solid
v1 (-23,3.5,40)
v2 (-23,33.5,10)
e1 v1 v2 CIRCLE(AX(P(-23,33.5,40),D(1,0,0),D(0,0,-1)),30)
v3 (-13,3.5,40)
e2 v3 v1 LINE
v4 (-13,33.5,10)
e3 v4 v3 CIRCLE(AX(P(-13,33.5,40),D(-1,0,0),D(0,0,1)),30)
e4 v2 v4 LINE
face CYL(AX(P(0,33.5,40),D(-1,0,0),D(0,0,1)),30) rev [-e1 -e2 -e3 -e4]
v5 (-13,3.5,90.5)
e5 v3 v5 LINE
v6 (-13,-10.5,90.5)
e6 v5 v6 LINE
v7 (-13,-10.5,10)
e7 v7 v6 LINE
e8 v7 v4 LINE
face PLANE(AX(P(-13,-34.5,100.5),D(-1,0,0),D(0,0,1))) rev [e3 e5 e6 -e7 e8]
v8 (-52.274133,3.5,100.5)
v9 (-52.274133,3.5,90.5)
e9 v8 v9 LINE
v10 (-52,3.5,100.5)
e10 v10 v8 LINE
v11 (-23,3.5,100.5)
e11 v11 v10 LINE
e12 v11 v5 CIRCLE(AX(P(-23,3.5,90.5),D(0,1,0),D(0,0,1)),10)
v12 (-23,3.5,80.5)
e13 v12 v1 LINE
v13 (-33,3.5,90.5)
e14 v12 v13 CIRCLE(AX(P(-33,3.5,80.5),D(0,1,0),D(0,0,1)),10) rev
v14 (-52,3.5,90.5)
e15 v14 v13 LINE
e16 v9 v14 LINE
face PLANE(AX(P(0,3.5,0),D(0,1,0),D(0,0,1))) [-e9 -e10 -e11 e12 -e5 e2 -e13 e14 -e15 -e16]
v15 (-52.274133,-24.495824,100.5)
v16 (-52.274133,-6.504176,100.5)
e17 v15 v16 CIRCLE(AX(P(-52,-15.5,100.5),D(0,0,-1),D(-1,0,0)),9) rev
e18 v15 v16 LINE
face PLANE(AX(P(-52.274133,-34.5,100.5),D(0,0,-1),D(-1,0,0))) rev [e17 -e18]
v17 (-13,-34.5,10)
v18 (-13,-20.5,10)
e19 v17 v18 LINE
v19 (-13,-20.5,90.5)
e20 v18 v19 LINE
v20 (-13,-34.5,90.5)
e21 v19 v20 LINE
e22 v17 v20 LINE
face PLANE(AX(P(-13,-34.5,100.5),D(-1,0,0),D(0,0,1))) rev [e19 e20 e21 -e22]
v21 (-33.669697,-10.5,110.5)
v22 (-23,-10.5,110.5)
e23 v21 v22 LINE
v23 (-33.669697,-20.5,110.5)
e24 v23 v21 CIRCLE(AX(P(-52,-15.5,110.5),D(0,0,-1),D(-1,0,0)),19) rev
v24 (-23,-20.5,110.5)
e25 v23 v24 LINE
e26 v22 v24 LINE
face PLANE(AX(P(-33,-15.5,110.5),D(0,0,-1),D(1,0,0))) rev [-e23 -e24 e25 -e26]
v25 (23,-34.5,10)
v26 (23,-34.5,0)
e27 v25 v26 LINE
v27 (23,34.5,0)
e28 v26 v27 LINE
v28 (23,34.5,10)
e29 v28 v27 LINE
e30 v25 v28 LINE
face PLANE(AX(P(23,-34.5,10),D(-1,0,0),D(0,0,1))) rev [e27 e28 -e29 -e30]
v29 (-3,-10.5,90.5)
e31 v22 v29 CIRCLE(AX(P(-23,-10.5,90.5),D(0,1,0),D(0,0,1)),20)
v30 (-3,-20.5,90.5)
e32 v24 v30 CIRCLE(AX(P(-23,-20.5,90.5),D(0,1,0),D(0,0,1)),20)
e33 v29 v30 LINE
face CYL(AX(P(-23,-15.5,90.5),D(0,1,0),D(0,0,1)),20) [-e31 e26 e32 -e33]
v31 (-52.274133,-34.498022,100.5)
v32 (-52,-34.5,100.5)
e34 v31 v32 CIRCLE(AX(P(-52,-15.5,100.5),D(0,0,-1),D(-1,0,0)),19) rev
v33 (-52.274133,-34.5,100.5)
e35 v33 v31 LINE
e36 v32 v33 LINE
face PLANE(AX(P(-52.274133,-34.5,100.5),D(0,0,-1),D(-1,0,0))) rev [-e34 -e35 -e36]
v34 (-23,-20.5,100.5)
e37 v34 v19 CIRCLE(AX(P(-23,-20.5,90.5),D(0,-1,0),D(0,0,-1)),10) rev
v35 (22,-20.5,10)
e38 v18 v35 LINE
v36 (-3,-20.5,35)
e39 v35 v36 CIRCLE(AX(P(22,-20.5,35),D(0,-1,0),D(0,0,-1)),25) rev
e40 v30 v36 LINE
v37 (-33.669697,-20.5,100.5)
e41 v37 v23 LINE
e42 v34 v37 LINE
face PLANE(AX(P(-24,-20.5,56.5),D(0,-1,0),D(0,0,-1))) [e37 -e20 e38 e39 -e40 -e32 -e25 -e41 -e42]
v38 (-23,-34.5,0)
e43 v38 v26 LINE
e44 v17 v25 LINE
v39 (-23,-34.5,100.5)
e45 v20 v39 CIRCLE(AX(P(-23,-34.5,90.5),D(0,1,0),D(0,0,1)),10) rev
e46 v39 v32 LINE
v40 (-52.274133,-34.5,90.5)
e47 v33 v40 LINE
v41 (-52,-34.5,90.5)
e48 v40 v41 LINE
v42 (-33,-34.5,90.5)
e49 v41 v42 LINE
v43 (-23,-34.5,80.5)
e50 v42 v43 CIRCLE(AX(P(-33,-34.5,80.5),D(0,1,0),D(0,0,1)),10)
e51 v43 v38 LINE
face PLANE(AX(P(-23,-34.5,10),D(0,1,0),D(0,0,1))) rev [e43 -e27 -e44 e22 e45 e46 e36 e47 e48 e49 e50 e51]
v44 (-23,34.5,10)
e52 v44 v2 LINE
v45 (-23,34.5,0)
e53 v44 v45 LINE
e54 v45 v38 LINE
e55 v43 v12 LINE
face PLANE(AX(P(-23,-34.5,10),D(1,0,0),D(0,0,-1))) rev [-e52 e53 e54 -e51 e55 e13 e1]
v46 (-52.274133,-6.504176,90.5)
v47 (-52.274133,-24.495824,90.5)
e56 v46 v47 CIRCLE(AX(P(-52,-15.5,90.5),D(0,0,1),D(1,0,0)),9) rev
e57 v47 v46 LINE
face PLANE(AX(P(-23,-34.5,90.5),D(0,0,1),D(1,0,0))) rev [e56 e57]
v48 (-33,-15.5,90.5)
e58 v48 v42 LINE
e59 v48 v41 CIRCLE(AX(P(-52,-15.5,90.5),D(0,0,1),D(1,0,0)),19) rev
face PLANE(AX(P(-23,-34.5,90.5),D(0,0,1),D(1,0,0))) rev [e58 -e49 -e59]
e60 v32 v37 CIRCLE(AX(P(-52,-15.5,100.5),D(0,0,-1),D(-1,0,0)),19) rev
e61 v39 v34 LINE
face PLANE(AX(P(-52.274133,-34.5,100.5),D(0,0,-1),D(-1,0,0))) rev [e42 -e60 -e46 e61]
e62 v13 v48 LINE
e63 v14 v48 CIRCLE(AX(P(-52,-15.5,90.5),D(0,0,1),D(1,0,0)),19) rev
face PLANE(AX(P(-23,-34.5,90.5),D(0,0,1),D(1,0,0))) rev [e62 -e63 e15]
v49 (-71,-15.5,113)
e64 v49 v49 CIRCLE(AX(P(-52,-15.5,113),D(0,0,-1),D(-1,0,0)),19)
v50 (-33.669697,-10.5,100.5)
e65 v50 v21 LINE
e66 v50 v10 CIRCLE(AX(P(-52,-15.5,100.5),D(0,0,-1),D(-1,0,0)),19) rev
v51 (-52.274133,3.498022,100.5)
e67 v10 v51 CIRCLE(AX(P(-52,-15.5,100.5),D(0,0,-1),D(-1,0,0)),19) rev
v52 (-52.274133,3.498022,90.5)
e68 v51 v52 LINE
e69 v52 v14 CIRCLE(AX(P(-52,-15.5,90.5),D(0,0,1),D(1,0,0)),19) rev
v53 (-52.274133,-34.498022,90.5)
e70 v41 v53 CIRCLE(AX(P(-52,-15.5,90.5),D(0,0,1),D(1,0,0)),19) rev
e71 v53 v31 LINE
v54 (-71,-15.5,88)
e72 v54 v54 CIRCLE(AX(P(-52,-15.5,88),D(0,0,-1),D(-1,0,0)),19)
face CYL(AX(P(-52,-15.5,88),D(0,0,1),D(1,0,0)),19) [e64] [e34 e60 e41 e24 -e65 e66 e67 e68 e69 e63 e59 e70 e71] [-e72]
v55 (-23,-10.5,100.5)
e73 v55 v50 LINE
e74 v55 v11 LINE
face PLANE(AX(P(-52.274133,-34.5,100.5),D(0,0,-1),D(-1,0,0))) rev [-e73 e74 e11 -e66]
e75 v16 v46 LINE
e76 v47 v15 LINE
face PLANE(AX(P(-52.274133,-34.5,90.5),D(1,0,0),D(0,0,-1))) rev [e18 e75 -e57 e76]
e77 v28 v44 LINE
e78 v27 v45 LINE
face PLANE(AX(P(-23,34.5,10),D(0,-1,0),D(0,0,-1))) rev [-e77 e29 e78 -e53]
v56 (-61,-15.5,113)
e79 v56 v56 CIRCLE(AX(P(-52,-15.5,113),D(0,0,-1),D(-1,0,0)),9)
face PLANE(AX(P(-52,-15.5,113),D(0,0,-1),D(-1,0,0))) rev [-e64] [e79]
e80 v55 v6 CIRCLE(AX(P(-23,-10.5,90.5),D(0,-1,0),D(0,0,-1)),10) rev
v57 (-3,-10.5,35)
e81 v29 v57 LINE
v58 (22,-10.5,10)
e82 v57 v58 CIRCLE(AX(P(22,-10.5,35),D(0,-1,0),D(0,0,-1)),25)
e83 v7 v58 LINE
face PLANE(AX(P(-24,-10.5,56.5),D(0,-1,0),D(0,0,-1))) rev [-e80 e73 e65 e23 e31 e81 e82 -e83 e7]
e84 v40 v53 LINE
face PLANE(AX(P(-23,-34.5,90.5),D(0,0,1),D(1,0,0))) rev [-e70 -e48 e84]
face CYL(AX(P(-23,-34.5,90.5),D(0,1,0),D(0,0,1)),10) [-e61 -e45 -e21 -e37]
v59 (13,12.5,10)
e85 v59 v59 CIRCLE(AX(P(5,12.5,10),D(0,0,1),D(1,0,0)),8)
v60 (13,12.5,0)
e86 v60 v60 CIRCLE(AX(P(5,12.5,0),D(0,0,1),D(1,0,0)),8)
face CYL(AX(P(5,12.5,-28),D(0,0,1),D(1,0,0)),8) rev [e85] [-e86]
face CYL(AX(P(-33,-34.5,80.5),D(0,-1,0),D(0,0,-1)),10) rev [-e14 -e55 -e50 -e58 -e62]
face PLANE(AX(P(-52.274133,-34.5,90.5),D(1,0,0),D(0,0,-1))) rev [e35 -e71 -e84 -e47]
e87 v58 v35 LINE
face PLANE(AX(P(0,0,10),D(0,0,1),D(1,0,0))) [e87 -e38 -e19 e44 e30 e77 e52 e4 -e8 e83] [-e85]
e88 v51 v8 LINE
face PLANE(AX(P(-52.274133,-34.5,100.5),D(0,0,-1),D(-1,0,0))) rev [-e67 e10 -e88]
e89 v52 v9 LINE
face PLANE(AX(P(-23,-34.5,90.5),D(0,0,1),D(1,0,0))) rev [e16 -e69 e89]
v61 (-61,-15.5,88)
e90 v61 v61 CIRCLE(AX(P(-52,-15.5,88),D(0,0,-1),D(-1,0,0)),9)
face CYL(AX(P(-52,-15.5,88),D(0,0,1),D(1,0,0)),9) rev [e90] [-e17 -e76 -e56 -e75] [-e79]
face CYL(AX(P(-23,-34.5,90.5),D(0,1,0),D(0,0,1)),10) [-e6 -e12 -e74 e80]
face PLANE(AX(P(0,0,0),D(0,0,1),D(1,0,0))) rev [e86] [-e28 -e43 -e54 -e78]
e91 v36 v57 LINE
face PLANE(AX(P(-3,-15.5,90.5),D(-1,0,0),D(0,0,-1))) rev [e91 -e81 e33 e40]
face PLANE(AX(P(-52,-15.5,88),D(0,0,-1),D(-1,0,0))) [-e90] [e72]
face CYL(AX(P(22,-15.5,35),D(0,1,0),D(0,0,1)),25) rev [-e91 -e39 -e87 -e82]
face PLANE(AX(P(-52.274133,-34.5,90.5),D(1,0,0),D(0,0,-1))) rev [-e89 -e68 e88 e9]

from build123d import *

# Parameters (mm, degrees)
SKETCH1_W           = 69
SKETCH1_H           = 46
BOSS_EXTRUDE1_DEPTH = 10
SKETCH2_R           = 19
SKETCH2_R_2         = 9
BOSS_EXTRUDE2_DEPTH = 25
BOSS_EXTRUDE3_DEPTH = 19
FILLET1_R           = 30
FILLET2_R           = 10
RIB1_START          = -5
RIB1_DEPTH          = 10
FILLET3_R           = 25
SKETCH7_R           = 8
CUT_EXTRUDE1_DEPTH  = 38


# Read off the part's stored shape, not the designer's step: Rib1
with BuildPart() as part:
    # Sketch1 → Boss-Extrude1 (new body)
    with BuildSketch(Plane(origin=(0, 0, 0), x_dir=(0, 1, 0), z_dir=(0, 0, 1))):
        Rectangle(SKETCH1_W, SKETCH1_H)
    extrude(amount=BOSS_EXTRUDE1_DEPTH)



with BuildPart() as body_2:
    # Sketch2 → Boss-Extrude2 (new body)
    with BuildSketch(Plane(origin=(0, 0, 113), x_dir=(-1, 0, 0), z_dir=(0, 0, -1))):
        with Locations((52, -15.5)):
            Circle(SKETCH2_R)
        with Locations((52, -15.5)):
            Circle(SKETCH2_R_2, mode=Mode.SUBTRACT)
    extrude(amount=BOSS_EXTRUDE2_DEPTH)


with BuildPart() as part_1:
    add(part.part)

    add(body_2.part)  # Boss-Extrude3 merges body 2
    # Sketch5 → Boss-Extrude3 (add, symmetric)
    with BuildSketch(Plane(origin=(0, -15.5, 0), x_dir=(-1, 0, 0), z_dir=(0, -1, 0))):
        Polygon((23, -10), (23, -90.5), (52.274133124, -90.5), (52.274133124, -100.5), (13, -100.5), (13, -10), align=None)
    extrude(amount=BOSS_EXTRUDE3_DEPTH, both=True)

    # Fillet1
    fillet1_edges = [part_1.edges().sort_by_distance(p)[0] for p in [
        (-18, 3.5, 10),
    ]]
    fillet(fillet1_edges, radius=FILLET1_R)

    # Fillet2
    fillet2_edges = [part_1.edges().sort_by_distance(p)[0] for p in [
        (-23, -15.5, 90.5),
    ]]
    fillet(fillet2_edges, radius=FILLET2_R - 0.0001)  # a hair under: the kernel refuses the full size
    fillet2_2_edges = [part_1.edges().sort_by_distance(p)[0] for p in [
        (-13, -15.5, 100.5),
    ]]
    fillet(fillet2_2_edges, radius=FILLET2_R)

    # Rib1 outline → Rib1 (add)
    with BuildSketch(Plane(origin=(0, -15.5, 0), x_dir=(-1, 0, 0), z_dir=(0, -1, 0)).offset(RIB1_START)):
        with BuildLine():
            Line((23, -110.5), (35, -110.5))
            Line((35, -110.5), (35, -100.5))
            Line((35, -100.5), (23, -100.5))
            ThreePointArc((23, -100.5), (15.928932188, -97.571067812), (13, -90.5))
            Line((13, -90.5), (13, -10))
            Line((13, -10), (3, -10))
            Line((3, -10), (3, -90.5))
            ThreePointArc((3, -90.5), (8.857864376, -104.642135624), (23, -110.5))
        make_face()
    extrude(amount=RIB1_DEPTH)

    # Fillet3
    fillet3_edges = [part_1.edges().sort_by_distance(p)[0] for p in [
        (-3, -15.5, 10),
    ]]
    fillet(fillet3_edges, radius=FILLET3_R)

    # Sketch7 → Cut-Extrude1 (cut)
    with BuildSketch(Plane.XY.offset(10)):
        with Locations((5, 12.5)):
            Circle(SKETCH7_R)
    extrude(amount=-CUT_EXTRUDE1_DEPTH, mode=Mode.SUBTRACT)


solid = part_1.part
